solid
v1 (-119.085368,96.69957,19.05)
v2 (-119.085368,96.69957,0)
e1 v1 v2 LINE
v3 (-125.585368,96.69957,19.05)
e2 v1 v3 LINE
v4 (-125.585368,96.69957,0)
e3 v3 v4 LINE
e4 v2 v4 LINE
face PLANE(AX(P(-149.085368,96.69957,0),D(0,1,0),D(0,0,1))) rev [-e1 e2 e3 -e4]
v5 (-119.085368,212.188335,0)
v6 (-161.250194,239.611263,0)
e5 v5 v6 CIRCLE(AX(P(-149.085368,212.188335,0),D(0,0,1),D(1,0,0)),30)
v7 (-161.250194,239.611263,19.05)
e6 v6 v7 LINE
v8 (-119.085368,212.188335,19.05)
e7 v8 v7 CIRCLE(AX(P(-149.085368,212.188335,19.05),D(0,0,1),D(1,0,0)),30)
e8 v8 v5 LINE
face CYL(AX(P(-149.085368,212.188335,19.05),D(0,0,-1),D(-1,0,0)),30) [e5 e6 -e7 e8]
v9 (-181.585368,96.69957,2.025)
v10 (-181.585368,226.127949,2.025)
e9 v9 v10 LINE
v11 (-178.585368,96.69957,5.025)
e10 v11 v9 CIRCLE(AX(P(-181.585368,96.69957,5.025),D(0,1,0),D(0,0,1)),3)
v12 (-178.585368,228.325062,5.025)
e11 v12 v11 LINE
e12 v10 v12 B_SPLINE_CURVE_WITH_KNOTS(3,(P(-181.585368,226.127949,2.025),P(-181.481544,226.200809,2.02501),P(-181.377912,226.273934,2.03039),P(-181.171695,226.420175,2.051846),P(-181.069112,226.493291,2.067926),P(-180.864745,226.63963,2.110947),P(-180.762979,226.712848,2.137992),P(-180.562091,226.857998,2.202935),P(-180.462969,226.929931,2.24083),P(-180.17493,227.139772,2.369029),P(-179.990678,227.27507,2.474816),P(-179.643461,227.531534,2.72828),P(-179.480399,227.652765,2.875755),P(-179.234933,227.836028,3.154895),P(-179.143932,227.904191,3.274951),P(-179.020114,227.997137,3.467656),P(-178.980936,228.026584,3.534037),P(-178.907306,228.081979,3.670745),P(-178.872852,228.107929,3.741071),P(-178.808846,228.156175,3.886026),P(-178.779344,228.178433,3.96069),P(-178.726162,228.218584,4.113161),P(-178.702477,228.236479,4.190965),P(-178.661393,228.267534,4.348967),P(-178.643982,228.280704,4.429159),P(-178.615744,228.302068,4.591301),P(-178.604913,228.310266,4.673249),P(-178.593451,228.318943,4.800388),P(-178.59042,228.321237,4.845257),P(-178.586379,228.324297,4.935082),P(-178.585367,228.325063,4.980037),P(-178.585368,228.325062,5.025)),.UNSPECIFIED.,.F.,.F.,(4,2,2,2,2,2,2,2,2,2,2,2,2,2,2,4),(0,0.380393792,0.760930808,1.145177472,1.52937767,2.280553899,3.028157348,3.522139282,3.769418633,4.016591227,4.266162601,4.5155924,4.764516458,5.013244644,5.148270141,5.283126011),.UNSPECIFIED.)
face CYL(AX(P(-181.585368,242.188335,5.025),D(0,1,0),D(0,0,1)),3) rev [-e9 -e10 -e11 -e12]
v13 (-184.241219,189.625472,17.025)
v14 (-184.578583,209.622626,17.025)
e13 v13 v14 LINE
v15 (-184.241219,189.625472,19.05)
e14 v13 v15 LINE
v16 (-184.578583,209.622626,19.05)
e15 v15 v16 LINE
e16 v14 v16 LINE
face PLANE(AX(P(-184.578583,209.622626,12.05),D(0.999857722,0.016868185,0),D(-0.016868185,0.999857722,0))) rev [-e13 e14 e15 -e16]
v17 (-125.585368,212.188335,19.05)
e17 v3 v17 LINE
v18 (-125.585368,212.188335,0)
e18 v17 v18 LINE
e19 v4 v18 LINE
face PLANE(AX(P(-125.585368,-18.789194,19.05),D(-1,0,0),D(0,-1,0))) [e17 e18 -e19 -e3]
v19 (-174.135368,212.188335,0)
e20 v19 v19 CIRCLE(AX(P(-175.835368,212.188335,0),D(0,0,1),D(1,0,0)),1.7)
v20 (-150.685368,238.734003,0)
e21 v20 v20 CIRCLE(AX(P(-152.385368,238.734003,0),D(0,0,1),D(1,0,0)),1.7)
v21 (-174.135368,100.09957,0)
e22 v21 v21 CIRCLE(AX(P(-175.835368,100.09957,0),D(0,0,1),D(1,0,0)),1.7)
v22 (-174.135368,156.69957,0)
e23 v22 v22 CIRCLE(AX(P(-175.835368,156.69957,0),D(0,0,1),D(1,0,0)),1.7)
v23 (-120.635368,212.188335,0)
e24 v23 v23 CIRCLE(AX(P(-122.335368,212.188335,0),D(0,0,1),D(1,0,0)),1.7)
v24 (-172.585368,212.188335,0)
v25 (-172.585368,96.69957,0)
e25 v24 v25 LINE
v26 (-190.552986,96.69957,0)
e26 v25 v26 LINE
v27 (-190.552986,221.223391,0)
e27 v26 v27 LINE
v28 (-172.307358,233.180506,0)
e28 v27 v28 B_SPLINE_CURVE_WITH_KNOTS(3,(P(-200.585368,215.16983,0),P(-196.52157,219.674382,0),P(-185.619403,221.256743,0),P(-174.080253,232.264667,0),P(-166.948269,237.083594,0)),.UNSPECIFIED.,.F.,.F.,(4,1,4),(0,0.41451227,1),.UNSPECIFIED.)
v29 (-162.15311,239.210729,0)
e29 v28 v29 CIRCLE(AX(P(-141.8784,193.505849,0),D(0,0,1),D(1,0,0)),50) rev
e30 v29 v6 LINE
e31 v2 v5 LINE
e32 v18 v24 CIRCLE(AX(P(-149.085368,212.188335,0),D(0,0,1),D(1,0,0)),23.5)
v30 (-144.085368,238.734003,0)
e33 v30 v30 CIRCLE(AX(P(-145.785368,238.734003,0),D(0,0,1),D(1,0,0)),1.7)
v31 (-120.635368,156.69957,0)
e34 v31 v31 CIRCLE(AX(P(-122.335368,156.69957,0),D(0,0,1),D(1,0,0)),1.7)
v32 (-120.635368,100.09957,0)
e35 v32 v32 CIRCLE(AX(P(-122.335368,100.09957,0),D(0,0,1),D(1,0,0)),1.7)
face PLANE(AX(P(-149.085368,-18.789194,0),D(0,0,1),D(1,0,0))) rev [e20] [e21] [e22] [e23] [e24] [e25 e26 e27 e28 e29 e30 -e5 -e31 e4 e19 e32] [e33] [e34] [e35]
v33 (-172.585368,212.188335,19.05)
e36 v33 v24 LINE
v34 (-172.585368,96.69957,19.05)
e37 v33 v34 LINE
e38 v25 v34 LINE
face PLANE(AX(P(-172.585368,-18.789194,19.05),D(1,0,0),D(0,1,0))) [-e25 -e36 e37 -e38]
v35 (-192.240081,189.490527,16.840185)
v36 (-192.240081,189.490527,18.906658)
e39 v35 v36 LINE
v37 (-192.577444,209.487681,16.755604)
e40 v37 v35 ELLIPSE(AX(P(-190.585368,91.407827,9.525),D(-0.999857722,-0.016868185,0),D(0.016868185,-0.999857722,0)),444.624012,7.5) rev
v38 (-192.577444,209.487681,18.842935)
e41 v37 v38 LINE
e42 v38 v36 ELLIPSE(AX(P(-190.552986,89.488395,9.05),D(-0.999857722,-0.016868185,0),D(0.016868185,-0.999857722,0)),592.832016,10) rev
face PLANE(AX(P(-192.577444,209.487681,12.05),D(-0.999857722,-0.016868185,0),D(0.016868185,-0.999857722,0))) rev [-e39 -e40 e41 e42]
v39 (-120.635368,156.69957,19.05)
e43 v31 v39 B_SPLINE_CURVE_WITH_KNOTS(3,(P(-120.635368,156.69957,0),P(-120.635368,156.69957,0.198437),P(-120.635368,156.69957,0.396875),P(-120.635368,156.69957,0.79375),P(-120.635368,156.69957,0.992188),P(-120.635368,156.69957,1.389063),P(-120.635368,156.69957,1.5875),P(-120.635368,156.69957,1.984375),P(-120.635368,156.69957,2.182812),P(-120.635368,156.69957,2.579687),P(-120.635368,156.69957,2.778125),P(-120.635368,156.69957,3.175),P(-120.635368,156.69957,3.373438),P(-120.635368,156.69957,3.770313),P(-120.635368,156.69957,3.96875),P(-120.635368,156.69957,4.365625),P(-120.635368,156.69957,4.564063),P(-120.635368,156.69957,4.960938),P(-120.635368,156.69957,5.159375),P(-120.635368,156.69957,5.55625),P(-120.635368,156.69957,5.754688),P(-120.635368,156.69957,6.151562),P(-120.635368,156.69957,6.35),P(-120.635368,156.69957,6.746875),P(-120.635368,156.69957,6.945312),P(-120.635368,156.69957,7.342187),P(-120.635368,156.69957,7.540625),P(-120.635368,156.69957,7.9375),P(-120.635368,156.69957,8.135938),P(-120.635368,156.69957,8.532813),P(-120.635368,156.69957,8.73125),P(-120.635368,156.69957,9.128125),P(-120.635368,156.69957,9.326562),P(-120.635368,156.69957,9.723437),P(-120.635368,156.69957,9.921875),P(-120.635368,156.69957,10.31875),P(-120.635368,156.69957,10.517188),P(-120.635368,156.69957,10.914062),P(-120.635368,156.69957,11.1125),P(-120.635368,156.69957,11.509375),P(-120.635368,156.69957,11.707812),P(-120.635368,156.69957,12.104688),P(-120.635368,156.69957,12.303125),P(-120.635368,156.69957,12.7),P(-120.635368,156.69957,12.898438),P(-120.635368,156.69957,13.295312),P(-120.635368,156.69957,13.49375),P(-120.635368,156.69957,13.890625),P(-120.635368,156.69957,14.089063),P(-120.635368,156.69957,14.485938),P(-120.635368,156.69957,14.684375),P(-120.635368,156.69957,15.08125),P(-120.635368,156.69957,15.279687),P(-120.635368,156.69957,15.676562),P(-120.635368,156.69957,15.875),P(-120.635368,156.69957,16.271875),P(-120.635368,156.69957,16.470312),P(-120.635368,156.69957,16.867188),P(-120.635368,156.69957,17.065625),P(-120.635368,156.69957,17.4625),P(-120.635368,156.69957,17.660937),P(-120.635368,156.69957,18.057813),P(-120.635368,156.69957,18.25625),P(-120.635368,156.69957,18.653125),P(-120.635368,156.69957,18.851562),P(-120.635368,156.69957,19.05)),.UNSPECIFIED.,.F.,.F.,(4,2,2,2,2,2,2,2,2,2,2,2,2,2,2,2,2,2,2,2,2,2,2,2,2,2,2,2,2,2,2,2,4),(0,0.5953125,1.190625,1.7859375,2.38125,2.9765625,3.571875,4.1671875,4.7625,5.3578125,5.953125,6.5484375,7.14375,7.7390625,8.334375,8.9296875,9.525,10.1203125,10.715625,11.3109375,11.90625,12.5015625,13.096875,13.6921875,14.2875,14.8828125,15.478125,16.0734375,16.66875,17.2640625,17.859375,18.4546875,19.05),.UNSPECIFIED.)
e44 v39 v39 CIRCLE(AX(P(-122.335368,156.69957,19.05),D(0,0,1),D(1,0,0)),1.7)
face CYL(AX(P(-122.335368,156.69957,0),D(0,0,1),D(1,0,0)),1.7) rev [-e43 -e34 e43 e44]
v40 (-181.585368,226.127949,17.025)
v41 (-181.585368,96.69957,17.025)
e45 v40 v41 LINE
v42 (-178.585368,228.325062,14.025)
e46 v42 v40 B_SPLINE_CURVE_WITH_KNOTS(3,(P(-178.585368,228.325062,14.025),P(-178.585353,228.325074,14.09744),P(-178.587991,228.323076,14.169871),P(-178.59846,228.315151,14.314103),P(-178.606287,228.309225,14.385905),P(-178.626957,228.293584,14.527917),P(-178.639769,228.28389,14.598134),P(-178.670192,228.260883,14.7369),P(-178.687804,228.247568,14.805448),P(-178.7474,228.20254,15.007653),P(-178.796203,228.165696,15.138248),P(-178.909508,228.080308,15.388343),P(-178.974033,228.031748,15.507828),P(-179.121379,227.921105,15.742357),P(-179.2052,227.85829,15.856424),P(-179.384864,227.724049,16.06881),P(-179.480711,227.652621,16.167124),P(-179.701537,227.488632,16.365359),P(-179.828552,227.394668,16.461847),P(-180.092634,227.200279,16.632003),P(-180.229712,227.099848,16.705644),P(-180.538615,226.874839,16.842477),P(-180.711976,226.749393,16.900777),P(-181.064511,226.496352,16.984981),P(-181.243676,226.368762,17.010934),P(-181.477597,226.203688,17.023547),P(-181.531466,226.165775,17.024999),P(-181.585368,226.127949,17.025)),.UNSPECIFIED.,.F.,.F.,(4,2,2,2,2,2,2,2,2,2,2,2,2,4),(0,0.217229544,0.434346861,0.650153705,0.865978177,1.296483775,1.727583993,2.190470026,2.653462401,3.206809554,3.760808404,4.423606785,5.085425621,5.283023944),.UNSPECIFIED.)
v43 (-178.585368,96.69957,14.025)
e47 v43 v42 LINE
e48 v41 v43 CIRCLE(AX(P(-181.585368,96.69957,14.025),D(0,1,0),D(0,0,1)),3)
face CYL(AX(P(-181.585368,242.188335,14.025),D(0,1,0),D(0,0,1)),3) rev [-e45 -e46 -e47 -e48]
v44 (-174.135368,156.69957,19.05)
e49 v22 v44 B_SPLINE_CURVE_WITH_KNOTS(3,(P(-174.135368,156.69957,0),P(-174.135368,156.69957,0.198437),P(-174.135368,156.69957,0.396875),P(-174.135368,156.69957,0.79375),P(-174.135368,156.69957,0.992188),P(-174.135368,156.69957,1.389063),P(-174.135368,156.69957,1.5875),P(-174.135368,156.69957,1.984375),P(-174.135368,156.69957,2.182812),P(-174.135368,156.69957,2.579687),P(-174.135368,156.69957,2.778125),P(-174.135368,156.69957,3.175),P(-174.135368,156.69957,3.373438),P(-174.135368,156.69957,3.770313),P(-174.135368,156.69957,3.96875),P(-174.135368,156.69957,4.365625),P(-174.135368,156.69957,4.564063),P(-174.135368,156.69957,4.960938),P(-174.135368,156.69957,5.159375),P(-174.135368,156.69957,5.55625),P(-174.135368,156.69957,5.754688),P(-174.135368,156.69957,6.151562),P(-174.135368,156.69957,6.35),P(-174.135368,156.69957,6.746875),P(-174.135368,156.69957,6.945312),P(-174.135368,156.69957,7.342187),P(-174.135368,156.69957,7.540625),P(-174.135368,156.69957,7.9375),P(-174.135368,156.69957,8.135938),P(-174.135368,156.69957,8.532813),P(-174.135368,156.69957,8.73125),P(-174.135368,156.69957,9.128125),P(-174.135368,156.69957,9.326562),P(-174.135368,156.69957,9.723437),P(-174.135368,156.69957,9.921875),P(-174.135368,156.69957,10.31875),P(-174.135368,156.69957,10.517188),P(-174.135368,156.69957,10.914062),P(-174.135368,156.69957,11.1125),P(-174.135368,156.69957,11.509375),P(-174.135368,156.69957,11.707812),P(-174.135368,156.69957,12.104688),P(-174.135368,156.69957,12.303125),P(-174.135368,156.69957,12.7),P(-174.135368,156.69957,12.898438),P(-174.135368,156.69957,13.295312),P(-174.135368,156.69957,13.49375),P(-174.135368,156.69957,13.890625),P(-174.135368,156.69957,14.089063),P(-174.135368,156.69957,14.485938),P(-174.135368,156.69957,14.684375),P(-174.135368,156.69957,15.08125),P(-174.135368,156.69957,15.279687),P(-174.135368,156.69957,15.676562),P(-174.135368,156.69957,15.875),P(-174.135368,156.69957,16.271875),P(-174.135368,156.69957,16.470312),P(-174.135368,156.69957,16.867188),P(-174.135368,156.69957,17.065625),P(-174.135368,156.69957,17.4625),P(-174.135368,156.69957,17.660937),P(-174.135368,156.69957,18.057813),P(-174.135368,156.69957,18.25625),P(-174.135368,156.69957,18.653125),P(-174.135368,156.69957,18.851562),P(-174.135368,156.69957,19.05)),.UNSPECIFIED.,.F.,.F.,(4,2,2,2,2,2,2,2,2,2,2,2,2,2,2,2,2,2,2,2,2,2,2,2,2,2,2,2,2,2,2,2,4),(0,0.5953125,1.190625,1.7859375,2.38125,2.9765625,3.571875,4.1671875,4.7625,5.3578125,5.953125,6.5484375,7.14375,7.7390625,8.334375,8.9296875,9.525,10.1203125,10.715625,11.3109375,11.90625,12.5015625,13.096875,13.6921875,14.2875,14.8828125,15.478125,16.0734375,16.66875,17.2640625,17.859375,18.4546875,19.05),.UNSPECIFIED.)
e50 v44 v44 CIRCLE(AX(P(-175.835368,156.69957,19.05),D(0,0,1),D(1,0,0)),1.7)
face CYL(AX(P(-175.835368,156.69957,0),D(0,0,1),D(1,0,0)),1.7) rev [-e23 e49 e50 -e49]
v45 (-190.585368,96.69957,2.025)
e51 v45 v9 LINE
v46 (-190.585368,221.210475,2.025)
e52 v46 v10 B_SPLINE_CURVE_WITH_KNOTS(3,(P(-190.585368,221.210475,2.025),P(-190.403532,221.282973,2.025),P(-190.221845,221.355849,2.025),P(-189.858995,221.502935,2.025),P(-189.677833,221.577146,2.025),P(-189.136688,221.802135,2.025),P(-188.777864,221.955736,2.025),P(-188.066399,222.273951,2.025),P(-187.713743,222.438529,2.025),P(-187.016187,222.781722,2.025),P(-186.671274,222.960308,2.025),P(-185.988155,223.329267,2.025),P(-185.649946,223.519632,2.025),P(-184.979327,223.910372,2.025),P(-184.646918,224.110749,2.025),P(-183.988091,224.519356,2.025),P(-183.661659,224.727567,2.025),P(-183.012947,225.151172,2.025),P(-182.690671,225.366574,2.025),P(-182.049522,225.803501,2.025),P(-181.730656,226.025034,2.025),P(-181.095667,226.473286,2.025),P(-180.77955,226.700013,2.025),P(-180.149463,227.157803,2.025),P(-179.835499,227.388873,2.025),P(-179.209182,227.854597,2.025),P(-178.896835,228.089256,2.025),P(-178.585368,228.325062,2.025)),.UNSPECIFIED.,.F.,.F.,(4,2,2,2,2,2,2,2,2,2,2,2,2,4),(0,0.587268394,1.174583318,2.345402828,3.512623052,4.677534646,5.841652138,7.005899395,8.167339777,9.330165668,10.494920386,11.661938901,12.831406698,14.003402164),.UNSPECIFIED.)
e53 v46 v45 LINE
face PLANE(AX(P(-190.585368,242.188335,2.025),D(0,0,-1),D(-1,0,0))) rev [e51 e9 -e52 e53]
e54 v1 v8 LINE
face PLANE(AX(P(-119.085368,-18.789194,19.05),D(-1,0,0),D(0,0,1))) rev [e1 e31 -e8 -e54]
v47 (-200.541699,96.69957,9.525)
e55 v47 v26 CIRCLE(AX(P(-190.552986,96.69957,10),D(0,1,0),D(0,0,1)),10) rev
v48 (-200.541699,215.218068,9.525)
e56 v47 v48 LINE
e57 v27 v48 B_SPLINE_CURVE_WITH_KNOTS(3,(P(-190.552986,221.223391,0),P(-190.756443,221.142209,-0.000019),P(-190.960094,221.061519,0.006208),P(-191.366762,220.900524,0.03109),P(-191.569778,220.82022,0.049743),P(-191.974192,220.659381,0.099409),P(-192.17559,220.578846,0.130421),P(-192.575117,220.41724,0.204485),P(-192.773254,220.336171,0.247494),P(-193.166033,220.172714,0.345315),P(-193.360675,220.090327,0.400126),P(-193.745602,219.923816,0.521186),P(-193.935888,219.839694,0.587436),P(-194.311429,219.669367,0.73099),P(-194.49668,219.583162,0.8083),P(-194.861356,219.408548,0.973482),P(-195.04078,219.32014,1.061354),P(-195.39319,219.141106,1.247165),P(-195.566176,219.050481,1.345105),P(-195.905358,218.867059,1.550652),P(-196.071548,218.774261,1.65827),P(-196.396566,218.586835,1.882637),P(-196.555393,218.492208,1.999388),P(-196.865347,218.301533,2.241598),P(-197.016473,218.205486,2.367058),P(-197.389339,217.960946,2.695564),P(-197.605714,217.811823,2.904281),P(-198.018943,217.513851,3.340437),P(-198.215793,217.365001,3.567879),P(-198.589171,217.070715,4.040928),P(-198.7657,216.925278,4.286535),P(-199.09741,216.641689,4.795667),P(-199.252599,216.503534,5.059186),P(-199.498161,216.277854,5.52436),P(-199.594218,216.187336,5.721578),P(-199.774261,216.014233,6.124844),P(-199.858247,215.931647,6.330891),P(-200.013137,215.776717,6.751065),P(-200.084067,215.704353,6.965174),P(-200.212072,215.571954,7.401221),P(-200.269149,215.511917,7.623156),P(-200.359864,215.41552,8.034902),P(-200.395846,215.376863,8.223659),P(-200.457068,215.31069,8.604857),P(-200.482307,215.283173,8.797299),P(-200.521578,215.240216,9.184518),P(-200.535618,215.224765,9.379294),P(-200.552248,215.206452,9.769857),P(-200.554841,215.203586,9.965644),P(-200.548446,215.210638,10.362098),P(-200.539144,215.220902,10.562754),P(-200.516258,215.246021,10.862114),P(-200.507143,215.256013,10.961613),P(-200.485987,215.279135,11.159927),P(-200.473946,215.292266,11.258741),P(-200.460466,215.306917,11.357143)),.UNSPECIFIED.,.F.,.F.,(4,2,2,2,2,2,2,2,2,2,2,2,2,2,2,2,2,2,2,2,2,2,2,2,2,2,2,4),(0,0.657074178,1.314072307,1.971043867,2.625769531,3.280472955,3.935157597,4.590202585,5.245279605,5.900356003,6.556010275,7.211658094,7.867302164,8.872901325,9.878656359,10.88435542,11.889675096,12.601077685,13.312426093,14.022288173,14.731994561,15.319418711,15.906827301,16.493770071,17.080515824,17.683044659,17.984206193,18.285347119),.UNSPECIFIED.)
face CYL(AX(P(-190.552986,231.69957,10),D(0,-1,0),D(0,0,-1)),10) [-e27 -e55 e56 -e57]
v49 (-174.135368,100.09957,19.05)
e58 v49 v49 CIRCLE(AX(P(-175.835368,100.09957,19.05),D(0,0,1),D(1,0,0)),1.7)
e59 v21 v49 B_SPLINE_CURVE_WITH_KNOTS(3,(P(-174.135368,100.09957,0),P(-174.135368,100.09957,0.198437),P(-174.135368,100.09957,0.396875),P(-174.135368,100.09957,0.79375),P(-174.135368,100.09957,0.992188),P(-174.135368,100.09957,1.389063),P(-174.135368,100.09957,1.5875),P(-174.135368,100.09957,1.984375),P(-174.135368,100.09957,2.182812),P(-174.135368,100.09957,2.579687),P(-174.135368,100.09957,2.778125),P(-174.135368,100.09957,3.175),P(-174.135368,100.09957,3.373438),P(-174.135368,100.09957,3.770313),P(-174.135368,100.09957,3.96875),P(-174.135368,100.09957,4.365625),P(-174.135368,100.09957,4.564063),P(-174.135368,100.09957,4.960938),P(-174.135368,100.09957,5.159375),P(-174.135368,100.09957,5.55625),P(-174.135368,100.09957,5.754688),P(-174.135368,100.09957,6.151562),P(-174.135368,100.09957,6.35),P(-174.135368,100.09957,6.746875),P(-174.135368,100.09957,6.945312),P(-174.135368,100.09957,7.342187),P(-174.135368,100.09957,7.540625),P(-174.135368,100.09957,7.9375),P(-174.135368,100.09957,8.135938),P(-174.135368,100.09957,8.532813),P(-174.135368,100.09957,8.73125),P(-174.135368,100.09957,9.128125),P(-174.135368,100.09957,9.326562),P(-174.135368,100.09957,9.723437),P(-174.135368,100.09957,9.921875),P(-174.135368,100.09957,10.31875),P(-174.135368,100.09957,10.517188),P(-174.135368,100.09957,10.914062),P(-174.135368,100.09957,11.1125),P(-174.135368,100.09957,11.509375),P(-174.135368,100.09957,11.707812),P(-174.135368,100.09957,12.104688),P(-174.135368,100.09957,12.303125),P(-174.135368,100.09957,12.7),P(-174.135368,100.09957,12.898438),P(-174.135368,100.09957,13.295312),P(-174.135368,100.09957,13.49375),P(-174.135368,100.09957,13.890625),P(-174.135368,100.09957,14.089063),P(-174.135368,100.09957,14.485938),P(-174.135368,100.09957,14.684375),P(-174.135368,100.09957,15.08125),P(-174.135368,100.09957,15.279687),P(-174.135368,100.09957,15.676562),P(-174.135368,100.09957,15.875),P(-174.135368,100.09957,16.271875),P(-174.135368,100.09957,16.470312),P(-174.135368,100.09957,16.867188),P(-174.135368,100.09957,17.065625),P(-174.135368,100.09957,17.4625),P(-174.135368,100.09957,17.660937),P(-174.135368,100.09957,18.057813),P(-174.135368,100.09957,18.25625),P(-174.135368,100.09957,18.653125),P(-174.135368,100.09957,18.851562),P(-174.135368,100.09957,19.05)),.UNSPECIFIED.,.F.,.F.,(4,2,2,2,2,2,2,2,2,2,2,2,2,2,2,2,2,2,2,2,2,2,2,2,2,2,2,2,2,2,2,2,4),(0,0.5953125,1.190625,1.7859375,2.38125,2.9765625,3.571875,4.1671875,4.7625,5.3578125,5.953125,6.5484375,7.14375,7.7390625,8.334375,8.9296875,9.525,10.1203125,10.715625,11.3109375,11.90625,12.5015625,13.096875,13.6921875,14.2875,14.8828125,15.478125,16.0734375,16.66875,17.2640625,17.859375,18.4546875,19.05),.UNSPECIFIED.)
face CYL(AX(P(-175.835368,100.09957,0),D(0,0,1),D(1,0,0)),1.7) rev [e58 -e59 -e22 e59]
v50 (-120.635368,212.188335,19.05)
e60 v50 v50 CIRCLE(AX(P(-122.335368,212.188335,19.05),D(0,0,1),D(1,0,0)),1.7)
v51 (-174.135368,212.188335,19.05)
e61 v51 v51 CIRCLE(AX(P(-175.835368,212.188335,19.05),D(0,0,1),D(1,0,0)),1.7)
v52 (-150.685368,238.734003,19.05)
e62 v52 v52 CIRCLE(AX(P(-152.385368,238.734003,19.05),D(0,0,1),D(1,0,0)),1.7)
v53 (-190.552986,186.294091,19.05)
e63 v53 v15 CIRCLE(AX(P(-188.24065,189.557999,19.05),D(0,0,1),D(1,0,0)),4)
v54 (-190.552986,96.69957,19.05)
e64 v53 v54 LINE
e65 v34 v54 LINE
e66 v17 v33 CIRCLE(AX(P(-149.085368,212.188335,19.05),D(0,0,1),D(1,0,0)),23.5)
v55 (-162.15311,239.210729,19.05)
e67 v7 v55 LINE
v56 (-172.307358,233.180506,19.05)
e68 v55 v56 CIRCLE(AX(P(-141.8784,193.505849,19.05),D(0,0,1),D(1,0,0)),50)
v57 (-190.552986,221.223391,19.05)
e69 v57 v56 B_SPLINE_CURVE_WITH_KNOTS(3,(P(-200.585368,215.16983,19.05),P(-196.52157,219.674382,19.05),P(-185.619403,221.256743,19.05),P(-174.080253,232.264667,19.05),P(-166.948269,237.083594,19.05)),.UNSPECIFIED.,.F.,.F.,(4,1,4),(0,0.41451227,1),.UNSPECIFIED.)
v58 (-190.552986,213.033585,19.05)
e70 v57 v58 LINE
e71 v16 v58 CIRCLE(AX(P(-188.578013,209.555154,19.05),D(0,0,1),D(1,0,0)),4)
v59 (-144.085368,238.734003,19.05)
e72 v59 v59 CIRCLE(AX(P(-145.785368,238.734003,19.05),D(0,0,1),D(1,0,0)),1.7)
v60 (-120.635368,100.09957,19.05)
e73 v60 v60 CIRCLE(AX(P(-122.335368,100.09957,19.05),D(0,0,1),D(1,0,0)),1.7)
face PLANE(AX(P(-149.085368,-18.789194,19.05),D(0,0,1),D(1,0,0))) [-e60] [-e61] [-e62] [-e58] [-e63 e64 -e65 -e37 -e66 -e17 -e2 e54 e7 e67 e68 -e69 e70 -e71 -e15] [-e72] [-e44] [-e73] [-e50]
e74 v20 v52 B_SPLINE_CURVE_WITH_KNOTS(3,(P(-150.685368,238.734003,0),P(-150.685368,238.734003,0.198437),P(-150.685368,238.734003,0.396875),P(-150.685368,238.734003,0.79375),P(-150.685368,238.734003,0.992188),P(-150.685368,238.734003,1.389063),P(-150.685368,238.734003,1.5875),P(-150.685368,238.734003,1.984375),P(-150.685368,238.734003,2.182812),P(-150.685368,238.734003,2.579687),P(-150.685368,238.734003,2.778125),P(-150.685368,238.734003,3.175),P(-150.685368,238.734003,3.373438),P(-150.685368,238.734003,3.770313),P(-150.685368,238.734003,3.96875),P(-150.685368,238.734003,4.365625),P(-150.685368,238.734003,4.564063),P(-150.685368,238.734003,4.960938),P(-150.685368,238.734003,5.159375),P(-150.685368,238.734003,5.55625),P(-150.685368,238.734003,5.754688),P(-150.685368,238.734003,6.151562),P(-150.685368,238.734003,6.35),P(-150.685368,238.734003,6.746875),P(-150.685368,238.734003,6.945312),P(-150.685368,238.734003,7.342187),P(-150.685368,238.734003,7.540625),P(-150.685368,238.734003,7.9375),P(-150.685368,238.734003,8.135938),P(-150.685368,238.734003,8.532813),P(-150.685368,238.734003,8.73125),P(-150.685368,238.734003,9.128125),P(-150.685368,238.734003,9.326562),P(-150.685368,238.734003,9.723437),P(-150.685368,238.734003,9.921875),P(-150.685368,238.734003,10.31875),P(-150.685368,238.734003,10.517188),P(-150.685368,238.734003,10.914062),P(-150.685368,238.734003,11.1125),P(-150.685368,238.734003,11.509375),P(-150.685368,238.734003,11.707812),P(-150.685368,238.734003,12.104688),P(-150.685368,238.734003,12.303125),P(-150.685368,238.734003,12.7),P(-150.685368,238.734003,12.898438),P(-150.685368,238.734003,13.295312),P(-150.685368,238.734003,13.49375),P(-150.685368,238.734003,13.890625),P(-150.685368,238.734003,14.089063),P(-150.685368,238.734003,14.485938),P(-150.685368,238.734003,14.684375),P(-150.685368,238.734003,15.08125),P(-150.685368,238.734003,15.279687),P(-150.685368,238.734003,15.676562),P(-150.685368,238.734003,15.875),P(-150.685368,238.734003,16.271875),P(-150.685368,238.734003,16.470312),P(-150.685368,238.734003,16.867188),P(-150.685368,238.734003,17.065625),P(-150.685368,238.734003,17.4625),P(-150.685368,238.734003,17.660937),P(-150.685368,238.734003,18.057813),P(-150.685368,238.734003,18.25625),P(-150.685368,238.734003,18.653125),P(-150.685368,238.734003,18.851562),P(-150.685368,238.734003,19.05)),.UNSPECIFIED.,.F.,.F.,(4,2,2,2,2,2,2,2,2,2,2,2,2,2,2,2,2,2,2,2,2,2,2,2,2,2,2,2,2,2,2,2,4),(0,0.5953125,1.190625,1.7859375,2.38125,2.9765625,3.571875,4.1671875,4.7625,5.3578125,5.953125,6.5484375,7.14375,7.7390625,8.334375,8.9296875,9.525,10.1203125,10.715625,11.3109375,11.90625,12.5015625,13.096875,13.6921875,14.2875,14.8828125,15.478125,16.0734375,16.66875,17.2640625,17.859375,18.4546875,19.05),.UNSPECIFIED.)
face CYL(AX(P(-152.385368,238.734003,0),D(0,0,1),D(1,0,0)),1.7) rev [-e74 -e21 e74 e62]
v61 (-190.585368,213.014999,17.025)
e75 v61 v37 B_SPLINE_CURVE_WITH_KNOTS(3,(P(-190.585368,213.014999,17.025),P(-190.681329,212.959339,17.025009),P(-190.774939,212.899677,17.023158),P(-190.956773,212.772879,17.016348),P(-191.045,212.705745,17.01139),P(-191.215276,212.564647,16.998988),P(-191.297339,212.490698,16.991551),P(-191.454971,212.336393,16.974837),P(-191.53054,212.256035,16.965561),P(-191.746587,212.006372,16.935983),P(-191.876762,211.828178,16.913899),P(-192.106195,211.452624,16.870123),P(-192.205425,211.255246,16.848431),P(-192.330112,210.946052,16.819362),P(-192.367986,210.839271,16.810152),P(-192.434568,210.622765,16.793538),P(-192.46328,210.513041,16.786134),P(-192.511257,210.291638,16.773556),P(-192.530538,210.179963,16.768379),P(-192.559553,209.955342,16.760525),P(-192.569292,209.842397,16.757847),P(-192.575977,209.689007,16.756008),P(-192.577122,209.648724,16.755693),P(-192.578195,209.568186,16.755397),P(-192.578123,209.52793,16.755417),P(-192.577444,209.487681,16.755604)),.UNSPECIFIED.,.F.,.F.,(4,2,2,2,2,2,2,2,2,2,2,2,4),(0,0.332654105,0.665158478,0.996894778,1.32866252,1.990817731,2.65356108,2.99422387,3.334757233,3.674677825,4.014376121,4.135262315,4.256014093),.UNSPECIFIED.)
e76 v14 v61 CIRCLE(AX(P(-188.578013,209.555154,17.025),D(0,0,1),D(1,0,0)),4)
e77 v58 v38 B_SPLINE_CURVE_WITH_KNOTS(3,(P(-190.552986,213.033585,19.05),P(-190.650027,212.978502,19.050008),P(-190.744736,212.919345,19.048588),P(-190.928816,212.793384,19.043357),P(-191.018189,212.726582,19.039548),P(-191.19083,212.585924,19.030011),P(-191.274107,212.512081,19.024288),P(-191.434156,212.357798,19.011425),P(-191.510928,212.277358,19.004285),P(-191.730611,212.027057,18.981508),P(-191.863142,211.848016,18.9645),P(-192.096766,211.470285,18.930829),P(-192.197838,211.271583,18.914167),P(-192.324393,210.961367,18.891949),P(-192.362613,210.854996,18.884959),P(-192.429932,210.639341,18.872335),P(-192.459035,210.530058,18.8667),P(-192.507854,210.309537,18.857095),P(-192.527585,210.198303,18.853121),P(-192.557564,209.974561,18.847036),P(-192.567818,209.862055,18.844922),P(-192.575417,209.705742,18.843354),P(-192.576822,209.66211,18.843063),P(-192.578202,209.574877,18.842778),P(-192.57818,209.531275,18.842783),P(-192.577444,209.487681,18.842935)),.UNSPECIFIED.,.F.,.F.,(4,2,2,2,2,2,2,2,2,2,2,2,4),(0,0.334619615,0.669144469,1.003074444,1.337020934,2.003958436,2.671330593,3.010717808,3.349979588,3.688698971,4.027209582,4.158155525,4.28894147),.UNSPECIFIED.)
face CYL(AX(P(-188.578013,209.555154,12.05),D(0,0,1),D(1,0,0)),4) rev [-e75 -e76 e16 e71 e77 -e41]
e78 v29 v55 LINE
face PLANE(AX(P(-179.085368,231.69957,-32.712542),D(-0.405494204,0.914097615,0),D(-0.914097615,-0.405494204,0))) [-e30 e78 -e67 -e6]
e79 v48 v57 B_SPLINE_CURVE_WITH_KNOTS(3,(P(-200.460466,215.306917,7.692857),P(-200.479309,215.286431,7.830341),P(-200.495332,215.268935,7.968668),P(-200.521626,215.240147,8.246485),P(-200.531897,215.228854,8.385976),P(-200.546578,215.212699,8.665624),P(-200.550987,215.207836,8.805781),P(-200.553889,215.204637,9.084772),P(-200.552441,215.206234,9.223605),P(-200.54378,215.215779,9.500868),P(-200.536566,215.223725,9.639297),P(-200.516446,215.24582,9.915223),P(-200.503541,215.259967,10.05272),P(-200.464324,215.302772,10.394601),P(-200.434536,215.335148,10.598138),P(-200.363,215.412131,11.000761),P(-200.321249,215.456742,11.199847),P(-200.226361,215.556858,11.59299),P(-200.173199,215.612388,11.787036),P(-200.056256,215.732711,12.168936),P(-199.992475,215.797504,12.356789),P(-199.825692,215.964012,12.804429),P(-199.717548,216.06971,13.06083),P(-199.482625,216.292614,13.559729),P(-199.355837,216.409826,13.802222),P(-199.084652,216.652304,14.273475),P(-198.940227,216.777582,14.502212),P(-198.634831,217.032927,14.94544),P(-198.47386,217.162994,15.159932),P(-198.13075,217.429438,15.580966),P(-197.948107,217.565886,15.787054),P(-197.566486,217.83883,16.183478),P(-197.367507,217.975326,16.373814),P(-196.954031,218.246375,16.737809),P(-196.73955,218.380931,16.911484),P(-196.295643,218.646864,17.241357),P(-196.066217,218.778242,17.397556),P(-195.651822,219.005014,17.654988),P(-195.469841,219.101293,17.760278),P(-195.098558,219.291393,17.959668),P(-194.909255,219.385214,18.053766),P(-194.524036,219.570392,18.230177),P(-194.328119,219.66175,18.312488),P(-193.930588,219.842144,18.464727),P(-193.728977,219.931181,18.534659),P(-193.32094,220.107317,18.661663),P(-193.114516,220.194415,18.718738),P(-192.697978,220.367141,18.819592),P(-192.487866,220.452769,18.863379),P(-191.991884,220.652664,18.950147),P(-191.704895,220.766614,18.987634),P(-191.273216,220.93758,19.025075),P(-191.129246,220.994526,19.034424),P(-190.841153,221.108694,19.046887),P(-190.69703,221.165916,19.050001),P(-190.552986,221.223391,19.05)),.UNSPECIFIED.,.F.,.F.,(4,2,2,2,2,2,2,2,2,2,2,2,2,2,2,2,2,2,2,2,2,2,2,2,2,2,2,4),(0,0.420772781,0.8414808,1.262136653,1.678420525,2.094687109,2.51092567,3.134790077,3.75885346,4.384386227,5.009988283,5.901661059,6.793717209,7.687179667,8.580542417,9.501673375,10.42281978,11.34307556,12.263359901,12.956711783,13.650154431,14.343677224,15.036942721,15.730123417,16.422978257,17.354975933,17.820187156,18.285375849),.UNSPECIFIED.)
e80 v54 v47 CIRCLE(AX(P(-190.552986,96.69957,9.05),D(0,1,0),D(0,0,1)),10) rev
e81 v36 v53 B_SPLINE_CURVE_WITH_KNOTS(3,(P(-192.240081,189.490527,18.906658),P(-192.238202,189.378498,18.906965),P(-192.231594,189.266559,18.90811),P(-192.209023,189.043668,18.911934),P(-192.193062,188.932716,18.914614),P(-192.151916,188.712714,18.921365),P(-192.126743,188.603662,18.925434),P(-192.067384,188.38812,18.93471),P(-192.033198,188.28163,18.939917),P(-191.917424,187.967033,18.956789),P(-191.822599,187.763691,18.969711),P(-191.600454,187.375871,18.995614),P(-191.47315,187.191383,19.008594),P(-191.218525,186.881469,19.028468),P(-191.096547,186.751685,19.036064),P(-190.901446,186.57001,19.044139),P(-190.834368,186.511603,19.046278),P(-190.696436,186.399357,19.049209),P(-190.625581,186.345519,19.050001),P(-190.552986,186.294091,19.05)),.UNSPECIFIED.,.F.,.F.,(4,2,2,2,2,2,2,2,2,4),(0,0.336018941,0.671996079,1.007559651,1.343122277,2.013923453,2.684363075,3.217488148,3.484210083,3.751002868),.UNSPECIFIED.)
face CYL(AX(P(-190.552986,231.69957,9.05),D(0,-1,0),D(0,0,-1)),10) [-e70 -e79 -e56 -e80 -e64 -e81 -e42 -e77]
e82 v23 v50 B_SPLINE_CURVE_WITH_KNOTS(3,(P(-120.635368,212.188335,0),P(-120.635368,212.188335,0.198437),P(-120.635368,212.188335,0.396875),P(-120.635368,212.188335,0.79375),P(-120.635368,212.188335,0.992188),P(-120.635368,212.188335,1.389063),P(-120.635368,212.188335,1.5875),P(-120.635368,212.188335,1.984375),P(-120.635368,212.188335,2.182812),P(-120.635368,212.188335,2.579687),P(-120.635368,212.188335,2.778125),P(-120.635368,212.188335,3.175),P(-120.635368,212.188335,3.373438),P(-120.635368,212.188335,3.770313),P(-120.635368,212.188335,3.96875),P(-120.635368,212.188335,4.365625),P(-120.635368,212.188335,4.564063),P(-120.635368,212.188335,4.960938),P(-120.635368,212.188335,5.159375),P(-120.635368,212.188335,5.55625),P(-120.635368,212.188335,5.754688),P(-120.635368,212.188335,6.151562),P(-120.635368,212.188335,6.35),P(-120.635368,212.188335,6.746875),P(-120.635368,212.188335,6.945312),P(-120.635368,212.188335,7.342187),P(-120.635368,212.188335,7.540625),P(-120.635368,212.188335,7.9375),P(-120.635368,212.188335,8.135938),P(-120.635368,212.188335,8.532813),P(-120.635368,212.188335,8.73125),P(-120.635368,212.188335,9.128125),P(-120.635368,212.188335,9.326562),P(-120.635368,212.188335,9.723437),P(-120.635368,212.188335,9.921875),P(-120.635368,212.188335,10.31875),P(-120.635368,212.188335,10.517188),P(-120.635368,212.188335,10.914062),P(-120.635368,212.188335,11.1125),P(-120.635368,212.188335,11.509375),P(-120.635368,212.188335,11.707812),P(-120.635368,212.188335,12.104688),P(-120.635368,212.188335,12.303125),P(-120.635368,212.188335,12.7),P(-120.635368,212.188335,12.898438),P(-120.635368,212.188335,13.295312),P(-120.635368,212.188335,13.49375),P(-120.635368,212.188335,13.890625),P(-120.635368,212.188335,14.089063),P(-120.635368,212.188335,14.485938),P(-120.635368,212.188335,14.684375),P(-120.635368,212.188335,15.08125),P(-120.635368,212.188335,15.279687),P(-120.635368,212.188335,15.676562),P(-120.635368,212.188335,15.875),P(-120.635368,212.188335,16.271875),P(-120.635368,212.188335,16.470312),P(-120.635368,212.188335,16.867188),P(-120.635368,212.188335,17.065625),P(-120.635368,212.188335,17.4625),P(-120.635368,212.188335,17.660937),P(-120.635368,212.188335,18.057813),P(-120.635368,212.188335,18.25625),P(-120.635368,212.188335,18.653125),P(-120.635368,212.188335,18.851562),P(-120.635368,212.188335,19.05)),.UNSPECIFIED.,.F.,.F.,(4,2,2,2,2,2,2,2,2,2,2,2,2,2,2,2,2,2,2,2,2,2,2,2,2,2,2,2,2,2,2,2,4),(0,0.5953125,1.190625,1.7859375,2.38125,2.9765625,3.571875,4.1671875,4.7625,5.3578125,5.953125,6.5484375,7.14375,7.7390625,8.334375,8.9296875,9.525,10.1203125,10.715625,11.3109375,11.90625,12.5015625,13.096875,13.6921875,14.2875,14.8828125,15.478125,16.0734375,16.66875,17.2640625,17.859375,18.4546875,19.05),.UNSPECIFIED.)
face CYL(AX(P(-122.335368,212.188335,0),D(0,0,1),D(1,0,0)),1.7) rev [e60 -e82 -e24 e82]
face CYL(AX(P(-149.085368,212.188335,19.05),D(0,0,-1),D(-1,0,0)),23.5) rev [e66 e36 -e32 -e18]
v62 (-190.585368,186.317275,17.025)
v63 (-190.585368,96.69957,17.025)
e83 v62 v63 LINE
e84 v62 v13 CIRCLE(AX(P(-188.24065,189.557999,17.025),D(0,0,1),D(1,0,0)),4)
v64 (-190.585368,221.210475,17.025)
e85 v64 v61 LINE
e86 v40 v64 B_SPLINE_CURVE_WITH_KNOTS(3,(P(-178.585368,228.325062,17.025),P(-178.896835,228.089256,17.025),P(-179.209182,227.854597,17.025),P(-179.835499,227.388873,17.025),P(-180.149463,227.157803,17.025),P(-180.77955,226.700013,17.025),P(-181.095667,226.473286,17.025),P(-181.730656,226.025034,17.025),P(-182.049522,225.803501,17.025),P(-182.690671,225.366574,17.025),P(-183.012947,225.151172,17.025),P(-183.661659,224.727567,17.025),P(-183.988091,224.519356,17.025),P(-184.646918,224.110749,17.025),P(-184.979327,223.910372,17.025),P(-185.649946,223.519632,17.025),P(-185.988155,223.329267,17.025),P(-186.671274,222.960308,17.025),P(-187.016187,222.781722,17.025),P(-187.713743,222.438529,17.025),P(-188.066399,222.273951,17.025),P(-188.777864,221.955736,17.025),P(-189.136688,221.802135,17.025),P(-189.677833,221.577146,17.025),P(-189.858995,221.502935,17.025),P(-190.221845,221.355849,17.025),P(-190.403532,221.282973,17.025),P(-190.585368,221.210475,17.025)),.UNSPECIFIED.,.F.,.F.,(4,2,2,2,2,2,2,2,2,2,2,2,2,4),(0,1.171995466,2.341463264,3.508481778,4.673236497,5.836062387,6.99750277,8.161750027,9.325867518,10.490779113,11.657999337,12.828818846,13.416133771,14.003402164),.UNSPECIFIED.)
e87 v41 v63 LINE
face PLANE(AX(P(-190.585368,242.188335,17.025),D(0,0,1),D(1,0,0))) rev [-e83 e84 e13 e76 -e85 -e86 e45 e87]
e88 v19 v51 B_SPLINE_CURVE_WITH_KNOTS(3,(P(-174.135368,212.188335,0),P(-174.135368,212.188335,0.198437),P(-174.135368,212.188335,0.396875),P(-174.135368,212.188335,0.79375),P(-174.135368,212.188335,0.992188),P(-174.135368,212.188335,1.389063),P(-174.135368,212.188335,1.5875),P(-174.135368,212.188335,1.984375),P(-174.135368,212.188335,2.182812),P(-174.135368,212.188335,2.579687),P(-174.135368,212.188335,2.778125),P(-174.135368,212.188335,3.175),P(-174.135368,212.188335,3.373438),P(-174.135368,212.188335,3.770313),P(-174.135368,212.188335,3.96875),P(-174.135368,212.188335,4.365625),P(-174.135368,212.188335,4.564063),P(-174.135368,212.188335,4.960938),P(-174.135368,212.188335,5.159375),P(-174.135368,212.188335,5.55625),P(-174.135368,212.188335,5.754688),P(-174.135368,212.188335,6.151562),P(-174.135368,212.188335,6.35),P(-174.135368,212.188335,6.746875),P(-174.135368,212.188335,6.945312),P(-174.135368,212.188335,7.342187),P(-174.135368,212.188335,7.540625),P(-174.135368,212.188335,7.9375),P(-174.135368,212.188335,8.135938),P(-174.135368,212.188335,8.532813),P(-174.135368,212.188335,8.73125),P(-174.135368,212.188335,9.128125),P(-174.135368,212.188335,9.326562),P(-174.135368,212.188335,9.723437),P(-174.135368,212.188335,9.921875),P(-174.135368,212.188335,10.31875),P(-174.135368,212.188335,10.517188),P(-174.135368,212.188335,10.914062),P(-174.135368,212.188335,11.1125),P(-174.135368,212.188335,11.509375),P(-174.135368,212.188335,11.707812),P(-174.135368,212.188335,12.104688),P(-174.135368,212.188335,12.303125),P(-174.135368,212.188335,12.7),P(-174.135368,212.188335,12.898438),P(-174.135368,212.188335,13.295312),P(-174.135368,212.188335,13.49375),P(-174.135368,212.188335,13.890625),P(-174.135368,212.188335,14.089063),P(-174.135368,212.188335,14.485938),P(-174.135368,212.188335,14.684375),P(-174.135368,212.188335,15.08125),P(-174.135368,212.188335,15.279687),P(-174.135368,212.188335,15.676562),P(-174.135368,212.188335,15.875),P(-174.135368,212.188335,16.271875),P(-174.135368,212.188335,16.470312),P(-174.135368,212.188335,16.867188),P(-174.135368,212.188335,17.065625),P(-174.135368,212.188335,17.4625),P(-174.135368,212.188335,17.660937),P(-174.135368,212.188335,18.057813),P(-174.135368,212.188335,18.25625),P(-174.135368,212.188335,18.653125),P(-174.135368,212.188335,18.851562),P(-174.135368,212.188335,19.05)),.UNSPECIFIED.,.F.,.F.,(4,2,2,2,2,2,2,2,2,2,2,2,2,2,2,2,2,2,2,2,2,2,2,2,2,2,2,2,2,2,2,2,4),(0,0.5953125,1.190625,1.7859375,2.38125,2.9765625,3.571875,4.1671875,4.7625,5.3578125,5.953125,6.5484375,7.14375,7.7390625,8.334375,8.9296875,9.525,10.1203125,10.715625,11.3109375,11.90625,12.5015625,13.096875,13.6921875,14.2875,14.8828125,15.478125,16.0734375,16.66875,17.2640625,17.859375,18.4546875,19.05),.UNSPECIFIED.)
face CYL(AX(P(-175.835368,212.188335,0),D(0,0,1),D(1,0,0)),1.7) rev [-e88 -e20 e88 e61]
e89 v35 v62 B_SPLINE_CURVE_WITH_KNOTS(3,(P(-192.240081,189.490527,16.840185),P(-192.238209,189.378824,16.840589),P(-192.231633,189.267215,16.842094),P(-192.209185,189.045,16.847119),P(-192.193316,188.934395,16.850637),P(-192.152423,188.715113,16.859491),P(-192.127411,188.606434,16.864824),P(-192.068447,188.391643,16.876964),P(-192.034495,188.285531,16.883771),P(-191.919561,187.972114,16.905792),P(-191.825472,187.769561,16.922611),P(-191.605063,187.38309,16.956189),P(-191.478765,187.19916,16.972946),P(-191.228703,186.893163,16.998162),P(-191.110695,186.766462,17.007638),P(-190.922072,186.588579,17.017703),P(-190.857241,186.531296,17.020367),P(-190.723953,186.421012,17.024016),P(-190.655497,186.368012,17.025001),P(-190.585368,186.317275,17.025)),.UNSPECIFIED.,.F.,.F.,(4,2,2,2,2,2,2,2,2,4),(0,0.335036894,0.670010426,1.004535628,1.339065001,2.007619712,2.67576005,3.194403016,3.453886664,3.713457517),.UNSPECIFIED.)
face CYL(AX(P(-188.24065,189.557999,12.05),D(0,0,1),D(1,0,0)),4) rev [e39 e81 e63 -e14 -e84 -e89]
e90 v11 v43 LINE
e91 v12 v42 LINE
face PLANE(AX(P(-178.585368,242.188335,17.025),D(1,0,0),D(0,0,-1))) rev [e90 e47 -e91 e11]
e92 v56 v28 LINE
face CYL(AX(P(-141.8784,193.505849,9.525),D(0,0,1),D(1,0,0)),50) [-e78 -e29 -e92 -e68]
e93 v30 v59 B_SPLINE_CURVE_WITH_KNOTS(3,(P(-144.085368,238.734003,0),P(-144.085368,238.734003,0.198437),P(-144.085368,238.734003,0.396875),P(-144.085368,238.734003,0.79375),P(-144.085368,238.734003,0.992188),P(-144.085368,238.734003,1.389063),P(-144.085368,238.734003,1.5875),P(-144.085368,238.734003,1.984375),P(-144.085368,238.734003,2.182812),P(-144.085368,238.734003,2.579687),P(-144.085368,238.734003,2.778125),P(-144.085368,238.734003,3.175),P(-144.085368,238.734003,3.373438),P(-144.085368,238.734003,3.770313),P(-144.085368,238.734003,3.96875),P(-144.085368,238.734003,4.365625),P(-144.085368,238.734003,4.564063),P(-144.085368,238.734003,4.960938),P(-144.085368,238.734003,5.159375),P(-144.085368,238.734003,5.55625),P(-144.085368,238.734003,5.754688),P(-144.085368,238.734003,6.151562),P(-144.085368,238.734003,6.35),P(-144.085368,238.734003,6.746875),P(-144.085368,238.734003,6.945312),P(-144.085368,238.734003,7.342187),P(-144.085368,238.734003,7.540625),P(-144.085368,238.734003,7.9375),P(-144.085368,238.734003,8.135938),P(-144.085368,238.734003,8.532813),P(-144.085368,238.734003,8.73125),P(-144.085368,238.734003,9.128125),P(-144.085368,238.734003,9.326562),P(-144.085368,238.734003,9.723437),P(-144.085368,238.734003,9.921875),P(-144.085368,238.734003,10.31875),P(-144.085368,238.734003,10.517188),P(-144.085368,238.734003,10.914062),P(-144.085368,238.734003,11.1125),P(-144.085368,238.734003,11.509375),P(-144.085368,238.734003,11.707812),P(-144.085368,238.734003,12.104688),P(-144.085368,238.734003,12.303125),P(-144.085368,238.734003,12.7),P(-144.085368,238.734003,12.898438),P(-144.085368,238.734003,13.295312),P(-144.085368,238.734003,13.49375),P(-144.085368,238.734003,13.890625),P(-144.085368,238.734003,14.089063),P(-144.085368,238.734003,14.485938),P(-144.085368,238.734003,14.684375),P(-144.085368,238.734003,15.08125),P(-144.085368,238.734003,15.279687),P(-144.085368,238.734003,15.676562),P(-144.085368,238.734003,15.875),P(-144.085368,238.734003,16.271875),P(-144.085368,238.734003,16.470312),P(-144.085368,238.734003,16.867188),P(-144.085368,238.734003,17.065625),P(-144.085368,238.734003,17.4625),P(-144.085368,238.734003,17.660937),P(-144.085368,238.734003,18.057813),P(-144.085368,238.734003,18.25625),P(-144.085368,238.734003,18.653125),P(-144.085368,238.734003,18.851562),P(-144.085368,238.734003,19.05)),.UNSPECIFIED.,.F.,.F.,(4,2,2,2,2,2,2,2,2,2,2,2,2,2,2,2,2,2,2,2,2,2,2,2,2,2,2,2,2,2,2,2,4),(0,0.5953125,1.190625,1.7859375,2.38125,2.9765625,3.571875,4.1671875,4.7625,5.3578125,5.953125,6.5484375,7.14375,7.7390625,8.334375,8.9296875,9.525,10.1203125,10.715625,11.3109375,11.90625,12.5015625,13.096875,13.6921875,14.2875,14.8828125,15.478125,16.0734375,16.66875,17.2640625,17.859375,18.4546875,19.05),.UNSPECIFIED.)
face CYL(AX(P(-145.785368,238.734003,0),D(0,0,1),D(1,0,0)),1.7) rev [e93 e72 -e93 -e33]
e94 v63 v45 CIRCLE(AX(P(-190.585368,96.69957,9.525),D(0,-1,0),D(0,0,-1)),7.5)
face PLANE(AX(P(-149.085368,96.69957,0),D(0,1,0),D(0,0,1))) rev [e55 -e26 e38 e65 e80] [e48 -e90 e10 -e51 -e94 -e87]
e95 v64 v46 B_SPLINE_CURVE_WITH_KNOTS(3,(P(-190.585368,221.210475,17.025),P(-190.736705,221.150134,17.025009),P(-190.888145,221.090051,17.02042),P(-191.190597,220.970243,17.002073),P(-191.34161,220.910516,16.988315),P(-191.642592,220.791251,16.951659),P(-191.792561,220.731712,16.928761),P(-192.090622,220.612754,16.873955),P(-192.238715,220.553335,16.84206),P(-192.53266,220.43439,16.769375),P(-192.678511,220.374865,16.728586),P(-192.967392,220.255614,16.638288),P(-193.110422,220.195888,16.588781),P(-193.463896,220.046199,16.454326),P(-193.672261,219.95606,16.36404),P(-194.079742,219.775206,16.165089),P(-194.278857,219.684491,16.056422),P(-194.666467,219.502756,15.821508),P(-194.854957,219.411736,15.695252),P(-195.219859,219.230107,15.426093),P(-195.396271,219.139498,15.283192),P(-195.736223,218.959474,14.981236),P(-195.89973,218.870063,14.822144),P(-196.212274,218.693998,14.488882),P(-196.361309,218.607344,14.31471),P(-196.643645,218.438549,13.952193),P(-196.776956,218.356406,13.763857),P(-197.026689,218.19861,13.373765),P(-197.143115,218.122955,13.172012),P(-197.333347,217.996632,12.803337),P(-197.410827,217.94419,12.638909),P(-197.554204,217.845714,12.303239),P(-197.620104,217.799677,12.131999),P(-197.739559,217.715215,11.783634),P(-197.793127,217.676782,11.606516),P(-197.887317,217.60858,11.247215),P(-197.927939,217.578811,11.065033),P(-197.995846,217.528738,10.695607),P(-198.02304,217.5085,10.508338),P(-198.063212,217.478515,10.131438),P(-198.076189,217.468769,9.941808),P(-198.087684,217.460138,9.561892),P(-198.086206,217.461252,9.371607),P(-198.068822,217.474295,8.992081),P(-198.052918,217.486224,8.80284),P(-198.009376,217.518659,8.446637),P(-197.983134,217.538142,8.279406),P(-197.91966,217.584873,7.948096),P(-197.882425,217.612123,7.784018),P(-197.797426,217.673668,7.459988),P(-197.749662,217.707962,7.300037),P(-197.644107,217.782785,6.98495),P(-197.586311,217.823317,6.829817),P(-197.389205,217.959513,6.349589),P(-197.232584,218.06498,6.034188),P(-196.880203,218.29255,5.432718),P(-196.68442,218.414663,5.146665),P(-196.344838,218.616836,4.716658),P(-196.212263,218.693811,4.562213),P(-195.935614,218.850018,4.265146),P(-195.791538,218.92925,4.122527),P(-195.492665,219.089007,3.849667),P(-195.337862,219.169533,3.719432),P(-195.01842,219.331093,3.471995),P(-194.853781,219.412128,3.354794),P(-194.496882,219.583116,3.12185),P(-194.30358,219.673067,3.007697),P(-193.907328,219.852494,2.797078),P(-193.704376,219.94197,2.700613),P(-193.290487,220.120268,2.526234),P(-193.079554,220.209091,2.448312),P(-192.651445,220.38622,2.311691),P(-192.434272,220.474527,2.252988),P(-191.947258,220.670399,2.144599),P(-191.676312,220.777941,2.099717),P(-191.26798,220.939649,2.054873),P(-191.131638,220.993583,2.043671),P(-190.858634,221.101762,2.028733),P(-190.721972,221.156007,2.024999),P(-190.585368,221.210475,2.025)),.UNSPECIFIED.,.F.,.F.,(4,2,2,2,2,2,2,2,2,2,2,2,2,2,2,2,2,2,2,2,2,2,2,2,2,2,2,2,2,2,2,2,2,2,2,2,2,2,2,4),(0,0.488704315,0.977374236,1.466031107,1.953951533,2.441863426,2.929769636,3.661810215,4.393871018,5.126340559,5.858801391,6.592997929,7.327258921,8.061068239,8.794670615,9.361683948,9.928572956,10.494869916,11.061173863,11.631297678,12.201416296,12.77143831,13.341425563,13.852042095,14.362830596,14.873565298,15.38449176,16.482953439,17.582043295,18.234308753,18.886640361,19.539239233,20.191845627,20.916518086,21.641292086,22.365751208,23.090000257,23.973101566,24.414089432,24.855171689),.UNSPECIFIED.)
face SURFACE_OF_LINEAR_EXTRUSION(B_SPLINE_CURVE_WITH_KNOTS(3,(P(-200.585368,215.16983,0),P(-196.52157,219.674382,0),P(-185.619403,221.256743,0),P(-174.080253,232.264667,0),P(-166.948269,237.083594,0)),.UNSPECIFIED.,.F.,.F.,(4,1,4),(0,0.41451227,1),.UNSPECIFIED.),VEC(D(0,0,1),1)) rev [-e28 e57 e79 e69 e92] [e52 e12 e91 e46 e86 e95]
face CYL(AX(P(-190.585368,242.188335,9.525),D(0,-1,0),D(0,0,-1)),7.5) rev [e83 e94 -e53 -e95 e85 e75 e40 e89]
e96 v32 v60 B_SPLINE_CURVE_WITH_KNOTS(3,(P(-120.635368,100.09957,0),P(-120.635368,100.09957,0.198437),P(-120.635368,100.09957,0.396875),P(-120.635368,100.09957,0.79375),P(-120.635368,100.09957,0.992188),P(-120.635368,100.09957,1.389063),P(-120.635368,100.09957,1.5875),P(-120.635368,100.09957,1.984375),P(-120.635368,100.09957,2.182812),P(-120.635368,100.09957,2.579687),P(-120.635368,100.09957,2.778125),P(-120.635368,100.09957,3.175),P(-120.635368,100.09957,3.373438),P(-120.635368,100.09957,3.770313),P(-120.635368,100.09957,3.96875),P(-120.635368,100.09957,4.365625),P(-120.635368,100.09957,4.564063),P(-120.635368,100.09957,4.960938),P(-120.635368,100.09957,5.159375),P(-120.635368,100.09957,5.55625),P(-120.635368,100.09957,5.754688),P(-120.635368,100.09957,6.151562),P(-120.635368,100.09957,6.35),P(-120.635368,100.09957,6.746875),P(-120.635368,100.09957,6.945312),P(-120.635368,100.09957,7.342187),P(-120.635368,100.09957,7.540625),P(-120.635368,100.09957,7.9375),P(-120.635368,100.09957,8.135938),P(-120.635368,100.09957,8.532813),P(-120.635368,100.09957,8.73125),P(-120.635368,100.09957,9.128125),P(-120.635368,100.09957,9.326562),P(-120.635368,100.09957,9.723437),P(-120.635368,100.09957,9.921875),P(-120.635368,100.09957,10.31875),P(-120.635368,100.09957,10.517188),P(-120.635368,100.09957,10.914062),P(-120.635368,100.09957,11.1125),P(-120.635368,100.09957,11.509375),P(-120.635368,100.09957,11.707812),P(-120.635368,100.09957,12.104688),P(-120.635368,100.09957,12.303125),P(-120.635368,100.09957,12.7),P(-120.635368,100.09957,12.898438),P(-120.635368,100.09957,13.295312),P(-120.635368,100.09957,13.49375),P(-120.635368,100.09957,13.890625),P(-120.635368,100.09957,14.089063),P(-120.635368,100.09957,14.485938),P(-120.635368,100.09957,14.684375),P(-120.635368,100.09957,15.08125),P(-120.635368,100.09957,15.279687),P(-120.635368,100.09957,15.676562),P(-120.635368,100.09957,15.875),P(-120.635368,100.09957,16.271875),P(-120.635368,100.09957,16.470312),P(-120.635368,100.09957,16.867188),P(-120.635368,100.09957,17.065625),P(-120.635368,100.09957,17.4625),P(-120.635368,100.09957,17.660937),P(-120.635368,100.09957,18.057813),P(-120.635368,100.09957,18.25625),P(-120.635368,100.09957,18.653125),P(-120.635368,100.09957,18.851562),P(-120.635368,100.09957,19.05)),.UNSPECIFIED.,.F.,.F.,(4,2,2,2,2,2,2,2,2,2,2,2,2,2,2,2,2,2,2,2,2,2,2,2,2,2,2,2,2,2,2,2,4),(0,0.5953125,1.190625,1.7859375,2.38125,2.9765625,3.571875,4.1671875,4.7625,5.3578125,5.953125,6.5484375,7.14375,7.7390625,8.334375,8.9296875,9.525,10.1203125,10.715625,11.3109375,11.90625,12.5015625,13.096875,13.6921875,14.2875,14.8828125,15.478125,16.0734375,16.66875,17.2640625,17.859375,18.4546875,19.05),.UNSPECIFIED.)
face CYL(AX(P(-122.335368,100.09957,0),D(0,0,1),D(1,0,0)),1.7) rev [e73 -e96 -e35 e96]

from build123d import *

# Parameters (mm, degrees)
BOSS_EXTRUDE1_DEPTH = 19.05
SKETCH2_R           = 1.7
CUT_EXTRUDE1_DEPTH  = 302.810637772
CUT_EXTRUDE2_DEPTH  = 302.810637772
BOSS_EXTRUDE2_DEPTH = 135
BOSS_EXTRUDE3_START = -19.05
BOSS_EXTRUDE3_DEPTH = 19.05
CUT_EXTRUDE4_DEPTH  = 316.043777756
CUT_EXTRUDE5_DEPTH  = 249.524391307
CUT_EXTRUDE6_DEPTH  = 7
FILLET1_R           = 50
FILLET2_R           = 10
FILLET3_R           = 3


with BuildPart() as part:
    # Sketch1 → Boss-Extrude1 (new body)
    with BuildSketch(Plane.XY):
        with BuildLine():
            Line((-179.085368151, -18.789194183), (-179.085368151, 212.188334746))
            ThreePointArc((-179.085368151, 212.188334746), (-149.085368151, 242.188334746), (-119.085368151, 212.188334746))
            Line((-119.085368151, 212.188334746), (-119.085368151, -18.789194183))
            ThreePointArc((-119.085368151, -18.789194183), (-149.085368151, -48.789194183), (-179.085368151, -18.789194183))
        make_face()
        with BuildLine():
            Line((-172.585368151, -18.789194183), (-172.585368151, 212.188334746))
            ThreePointArc((-172.585368151, 212.188334746), (-149.085368151, 235.688334746), (-125.585368151, 212.188334746))
            Line((-125.585368151, 212.188334746), (-125.585368151, -18.789194183))
            ThreePointArc((-125.585368151, -18.789194183), (-149.085368151, -42.289194183), (-172.585368151, -18.789194183))
        make_face(mode=Mode.SUBTRACT)
    extrude(amount=BOSS_EXTRUDE1_DEPTH)

    # Sketch2 → Cut-Extrude1 (cut, through all)
    with BuildSketch(Plane.XY.offset(19.05)):
        with Locations((-145.785368151, 238.734002942)):
            Circle(SKETCH2_R)
        with Locations((-122.335368151, 212.188334746)):
            Circle(SKETCH2_R)
        with Locations((-152.485368151, -45.322239617)):
            Circle(SKETCH2_R)
        with Locations((-168.000474547, -37.70430058)):
            Circle(SKETCH2_R)
        with Locations((-175.835368151, -18.789194183)):
            Circle(SKETCH2_R)
        with Locations((-175.835368151, 212.188334746)):
            Circle(SKETCH2_R)
        with Locations((-145.685368151, -45.322239617)):
            Circle(SKETCH2_R)
        with Locations((-175.835368151, 100.099570281)):
            Circle(SKETCH2_R)
        with Locations((-175.835368151, 93.299570281)):
            Circle(SKETCH2_R)
        with Locations((-122.335368151, 100.099570281)):
            Circle(SKETCH2_R)
        with Locations((-122.335368151, 93.299570281)):
            Circle(SKETCH2_R)
        with Locations((-122.335368151, -18.789194183)):
            Circle(SKETCH2_R)
        with Locations((-130.170261754, -37.70430058)):
            Circle(SKETCH2_R)
        with Locations((-175.835368151, 156.699570281)):
            Circle(SKETCH2_R)
        with Locations((-122.335368151, 156.699570281)):
            Circle(SKETCH2_R)
        with Locations((-175.835368151, 66.699570281)):
            Circle(SKETCH2_R)
        with Locations((-122.335368151, 66.699570281)):
            Circle(SKETCH2_R)
        with Locations((-175.835368151, 36.699570281)):
            Circle(SKETCH2_R)
        with Locations((-122.335368151, 36.699570281)):
            Circle(SKETCH2_R)
        with Locations((-175.835368151, 6.699570281)):
            Circle(SKETCH2_R)
        with Locations((-122.335368151, 6.699570281)):
            Circle(SKETCH2_R)
        with Locations((-152.385368151, 238.734002942)):
            Circle(SKETCH2_R)
    extrude(amount=-CUT_EXTRUDE1_DEPTH, mode=Mode.SUBTRACT)

    # Sketch3 → Cut-Extrude2 (cut, through all)
    with BuildSketch(Plane.XY.offset(19.05)):
        Polygon((-149.085368151, 96.699570281), (-100.167336626, 96.699570281), (-100.167336626, -59.171887956), (-212.527814826, -59.171887956), (-212.527814826, 96.699570281), align=None)
    extrude(amount=-CUT_EXTRUDE2_DEPTH, mode=Mode.SUBTRACT)

    # Sketch4 → Boss-Extrude2 (add)
    with BuildSketch(Plane.XZ.offset(-96.699570281)):
        with BuildLine():
            Line((-179.085368151, 19.05), (-196.652205402, 19.05))
            ThreePointArc((-196.652205402, 19.05), (-200.585368151, 9.525), (-196.652205402, 0))
            Line((-196.652205402, 0), (-179.085368151, 0))
            Line((-179.085368151, 0), (-179.085368151, 19.05))
        make_face()
    extrude(amount=-BOSS_EXTRUDE2_DEPTH)

    # Sketch5 → Boss-Extrude3 (add)
    with BuildSketch(Plane.XY.offset(19.05).offset(BOSS_EXTRUDE3_START)):
        with BuildLine():
            Line((-179.085368151, 231.699570281), (-179.085368151, 212.188334746))
            ThreePointArc((-179.085368151, 212.188334746), (-174.234371945, 228.544605963), (-161.250194275, 239.611263206))
            Line((-161.250194275, 239.611263206), (-179.085368151, 231.699570281))
        make_face()
    extrude(amount=BOSS_EXTRUDE3_DEPTH)

    # Sketch6 → Cut-Extrude4 (cut, through all)
    with BuildSketch(Plane.XY.offset(19.05)):
        with BuildLine():
            Line((-166.948269283, 237.083594004), (-200.585368151, 237.083594004))
            Line((-200.585368151, 237.083594004), (-200.585368151, 215.169829532))
            add(Edge.make_bspline(
                [(-166.948269283, 237.083594004), (-174.08025285, 232.264666523), (-185.619403498, 221.256742546), (-196.521569709, 219.674382376), (-200.585368151, 215.169829532)],
                knots=[0, 0, 0, 0, 0.58548773, 1, 1, 1, 1], degree=3))
        make_face()
    extrude(amount=-CUT_EXTRUDE4_DEPTH, mode=Mode.SUBTRACT)

    # Sketch7 → Cut-Extrude5 (cut, through all)
    with BuildSketch(Plane.XZ.offset(-96.699570281)):
        with BuildLine():
            Line((-190.585368151, 17.025), (-178.585368151, 17.025))
            Line((-178.585368151, 17.025), (-178.585368151, 2.025))
            Line((-178.585368151, 2.025), (-190.585368151, 2.025))
            ThreePointArc((-190.585368151, 2.025), (-198.085368151, 9.525), (-190.585368151, 17.025))
        make_face()
    extrude(amount=-CUT_EXTRUDE5_DEPTH, mode=Mode.SUBTRACT)

    # Sketch8 → Cut-Extrude6 (cut)
    with BuildSketch(Plane.XY.offset(19.05)):
        with BuildLine():
            Line((-184.578582607, 209.622626451), (-184.241218911, 189.62547201))
            ThreePointArc((-184.241218911, 189.62547201), (-188.17317706, 185.558568382), (-192.240080687, 189.490526531))
            Line((-192.240080687, 189.490526531), (-192.577444383, 209.487680972))
            ThreePointArc((-192.577444383, 209.487680972), (-188.645486234, 213.554584599), (-184.578582607, 209.622626451))
        make_face()
    extrude(amount=-CUT_EXTRUDE6_DEPTH, mode=Mode.SUBTRACT)

    # Fillet1
    fillet1_edges = [part.edges().sort_by_distance(p)[0] for p in [
        (-166.948269283, 237.083594004, 9.525),
    ]]
    fillet(fillet1_edges, radius=FILLET1_R)

    # Fillet2
    # the kernel refuses this fillet: 10 mm, written as the material it takes off along each edge
    with BuildSketch(Plane(origin=(-196.652205402, 66.752998532, 0), x_dir=(1, 0, 0), z_dir=(0, 1, 0))) as fillet2_piece_1:
        with BuildLine():
            CenterArc((6.099219193, -10), FILLET2_R, 90, 97.799925588)
            ThreePointArc((-3.808260974, -11.357142857), (-3.23274377, -5.233062714), (0, 0))
            Line((0, 0), (6.099219193, 0))
        make_face()
    extrude(amount=181.626081549, mode=Mode.SUBTRACT)
    with BuildSketch(Plane(origin=(-196.652205402, 66.752998532, 19.05), x_dir=(-0.3179212804444137, 0, -0.9481171127242586), z_dir=(0, 1, 0))) as fillet2_piece_2:
        with BuildLine():
            CenterArc((7.542099552, -8.961986896), FILLET2_R, 63.66281519, 97.799925588)
            Line((-1.939071576, -5.782774091), (0, 0))
            ThreePointArc((0, 0), (5.98931435, 1.401317691), (11.9786287, 0))
        make_face()
    extrude(amount=181.626081549, mode=Mode.SUBTRACT)

    # Fillet3
    fillet3_edges = [part.edges().sort_by_distance(p)[0] for p in [
        (-178.585368151, 162.512316203, 17.025),
        (-178.585368151, 162.512316203, 2.025),
    ]]
    fillet(fillet3_edges, radius=FILLET3_R)


solid = part.part
